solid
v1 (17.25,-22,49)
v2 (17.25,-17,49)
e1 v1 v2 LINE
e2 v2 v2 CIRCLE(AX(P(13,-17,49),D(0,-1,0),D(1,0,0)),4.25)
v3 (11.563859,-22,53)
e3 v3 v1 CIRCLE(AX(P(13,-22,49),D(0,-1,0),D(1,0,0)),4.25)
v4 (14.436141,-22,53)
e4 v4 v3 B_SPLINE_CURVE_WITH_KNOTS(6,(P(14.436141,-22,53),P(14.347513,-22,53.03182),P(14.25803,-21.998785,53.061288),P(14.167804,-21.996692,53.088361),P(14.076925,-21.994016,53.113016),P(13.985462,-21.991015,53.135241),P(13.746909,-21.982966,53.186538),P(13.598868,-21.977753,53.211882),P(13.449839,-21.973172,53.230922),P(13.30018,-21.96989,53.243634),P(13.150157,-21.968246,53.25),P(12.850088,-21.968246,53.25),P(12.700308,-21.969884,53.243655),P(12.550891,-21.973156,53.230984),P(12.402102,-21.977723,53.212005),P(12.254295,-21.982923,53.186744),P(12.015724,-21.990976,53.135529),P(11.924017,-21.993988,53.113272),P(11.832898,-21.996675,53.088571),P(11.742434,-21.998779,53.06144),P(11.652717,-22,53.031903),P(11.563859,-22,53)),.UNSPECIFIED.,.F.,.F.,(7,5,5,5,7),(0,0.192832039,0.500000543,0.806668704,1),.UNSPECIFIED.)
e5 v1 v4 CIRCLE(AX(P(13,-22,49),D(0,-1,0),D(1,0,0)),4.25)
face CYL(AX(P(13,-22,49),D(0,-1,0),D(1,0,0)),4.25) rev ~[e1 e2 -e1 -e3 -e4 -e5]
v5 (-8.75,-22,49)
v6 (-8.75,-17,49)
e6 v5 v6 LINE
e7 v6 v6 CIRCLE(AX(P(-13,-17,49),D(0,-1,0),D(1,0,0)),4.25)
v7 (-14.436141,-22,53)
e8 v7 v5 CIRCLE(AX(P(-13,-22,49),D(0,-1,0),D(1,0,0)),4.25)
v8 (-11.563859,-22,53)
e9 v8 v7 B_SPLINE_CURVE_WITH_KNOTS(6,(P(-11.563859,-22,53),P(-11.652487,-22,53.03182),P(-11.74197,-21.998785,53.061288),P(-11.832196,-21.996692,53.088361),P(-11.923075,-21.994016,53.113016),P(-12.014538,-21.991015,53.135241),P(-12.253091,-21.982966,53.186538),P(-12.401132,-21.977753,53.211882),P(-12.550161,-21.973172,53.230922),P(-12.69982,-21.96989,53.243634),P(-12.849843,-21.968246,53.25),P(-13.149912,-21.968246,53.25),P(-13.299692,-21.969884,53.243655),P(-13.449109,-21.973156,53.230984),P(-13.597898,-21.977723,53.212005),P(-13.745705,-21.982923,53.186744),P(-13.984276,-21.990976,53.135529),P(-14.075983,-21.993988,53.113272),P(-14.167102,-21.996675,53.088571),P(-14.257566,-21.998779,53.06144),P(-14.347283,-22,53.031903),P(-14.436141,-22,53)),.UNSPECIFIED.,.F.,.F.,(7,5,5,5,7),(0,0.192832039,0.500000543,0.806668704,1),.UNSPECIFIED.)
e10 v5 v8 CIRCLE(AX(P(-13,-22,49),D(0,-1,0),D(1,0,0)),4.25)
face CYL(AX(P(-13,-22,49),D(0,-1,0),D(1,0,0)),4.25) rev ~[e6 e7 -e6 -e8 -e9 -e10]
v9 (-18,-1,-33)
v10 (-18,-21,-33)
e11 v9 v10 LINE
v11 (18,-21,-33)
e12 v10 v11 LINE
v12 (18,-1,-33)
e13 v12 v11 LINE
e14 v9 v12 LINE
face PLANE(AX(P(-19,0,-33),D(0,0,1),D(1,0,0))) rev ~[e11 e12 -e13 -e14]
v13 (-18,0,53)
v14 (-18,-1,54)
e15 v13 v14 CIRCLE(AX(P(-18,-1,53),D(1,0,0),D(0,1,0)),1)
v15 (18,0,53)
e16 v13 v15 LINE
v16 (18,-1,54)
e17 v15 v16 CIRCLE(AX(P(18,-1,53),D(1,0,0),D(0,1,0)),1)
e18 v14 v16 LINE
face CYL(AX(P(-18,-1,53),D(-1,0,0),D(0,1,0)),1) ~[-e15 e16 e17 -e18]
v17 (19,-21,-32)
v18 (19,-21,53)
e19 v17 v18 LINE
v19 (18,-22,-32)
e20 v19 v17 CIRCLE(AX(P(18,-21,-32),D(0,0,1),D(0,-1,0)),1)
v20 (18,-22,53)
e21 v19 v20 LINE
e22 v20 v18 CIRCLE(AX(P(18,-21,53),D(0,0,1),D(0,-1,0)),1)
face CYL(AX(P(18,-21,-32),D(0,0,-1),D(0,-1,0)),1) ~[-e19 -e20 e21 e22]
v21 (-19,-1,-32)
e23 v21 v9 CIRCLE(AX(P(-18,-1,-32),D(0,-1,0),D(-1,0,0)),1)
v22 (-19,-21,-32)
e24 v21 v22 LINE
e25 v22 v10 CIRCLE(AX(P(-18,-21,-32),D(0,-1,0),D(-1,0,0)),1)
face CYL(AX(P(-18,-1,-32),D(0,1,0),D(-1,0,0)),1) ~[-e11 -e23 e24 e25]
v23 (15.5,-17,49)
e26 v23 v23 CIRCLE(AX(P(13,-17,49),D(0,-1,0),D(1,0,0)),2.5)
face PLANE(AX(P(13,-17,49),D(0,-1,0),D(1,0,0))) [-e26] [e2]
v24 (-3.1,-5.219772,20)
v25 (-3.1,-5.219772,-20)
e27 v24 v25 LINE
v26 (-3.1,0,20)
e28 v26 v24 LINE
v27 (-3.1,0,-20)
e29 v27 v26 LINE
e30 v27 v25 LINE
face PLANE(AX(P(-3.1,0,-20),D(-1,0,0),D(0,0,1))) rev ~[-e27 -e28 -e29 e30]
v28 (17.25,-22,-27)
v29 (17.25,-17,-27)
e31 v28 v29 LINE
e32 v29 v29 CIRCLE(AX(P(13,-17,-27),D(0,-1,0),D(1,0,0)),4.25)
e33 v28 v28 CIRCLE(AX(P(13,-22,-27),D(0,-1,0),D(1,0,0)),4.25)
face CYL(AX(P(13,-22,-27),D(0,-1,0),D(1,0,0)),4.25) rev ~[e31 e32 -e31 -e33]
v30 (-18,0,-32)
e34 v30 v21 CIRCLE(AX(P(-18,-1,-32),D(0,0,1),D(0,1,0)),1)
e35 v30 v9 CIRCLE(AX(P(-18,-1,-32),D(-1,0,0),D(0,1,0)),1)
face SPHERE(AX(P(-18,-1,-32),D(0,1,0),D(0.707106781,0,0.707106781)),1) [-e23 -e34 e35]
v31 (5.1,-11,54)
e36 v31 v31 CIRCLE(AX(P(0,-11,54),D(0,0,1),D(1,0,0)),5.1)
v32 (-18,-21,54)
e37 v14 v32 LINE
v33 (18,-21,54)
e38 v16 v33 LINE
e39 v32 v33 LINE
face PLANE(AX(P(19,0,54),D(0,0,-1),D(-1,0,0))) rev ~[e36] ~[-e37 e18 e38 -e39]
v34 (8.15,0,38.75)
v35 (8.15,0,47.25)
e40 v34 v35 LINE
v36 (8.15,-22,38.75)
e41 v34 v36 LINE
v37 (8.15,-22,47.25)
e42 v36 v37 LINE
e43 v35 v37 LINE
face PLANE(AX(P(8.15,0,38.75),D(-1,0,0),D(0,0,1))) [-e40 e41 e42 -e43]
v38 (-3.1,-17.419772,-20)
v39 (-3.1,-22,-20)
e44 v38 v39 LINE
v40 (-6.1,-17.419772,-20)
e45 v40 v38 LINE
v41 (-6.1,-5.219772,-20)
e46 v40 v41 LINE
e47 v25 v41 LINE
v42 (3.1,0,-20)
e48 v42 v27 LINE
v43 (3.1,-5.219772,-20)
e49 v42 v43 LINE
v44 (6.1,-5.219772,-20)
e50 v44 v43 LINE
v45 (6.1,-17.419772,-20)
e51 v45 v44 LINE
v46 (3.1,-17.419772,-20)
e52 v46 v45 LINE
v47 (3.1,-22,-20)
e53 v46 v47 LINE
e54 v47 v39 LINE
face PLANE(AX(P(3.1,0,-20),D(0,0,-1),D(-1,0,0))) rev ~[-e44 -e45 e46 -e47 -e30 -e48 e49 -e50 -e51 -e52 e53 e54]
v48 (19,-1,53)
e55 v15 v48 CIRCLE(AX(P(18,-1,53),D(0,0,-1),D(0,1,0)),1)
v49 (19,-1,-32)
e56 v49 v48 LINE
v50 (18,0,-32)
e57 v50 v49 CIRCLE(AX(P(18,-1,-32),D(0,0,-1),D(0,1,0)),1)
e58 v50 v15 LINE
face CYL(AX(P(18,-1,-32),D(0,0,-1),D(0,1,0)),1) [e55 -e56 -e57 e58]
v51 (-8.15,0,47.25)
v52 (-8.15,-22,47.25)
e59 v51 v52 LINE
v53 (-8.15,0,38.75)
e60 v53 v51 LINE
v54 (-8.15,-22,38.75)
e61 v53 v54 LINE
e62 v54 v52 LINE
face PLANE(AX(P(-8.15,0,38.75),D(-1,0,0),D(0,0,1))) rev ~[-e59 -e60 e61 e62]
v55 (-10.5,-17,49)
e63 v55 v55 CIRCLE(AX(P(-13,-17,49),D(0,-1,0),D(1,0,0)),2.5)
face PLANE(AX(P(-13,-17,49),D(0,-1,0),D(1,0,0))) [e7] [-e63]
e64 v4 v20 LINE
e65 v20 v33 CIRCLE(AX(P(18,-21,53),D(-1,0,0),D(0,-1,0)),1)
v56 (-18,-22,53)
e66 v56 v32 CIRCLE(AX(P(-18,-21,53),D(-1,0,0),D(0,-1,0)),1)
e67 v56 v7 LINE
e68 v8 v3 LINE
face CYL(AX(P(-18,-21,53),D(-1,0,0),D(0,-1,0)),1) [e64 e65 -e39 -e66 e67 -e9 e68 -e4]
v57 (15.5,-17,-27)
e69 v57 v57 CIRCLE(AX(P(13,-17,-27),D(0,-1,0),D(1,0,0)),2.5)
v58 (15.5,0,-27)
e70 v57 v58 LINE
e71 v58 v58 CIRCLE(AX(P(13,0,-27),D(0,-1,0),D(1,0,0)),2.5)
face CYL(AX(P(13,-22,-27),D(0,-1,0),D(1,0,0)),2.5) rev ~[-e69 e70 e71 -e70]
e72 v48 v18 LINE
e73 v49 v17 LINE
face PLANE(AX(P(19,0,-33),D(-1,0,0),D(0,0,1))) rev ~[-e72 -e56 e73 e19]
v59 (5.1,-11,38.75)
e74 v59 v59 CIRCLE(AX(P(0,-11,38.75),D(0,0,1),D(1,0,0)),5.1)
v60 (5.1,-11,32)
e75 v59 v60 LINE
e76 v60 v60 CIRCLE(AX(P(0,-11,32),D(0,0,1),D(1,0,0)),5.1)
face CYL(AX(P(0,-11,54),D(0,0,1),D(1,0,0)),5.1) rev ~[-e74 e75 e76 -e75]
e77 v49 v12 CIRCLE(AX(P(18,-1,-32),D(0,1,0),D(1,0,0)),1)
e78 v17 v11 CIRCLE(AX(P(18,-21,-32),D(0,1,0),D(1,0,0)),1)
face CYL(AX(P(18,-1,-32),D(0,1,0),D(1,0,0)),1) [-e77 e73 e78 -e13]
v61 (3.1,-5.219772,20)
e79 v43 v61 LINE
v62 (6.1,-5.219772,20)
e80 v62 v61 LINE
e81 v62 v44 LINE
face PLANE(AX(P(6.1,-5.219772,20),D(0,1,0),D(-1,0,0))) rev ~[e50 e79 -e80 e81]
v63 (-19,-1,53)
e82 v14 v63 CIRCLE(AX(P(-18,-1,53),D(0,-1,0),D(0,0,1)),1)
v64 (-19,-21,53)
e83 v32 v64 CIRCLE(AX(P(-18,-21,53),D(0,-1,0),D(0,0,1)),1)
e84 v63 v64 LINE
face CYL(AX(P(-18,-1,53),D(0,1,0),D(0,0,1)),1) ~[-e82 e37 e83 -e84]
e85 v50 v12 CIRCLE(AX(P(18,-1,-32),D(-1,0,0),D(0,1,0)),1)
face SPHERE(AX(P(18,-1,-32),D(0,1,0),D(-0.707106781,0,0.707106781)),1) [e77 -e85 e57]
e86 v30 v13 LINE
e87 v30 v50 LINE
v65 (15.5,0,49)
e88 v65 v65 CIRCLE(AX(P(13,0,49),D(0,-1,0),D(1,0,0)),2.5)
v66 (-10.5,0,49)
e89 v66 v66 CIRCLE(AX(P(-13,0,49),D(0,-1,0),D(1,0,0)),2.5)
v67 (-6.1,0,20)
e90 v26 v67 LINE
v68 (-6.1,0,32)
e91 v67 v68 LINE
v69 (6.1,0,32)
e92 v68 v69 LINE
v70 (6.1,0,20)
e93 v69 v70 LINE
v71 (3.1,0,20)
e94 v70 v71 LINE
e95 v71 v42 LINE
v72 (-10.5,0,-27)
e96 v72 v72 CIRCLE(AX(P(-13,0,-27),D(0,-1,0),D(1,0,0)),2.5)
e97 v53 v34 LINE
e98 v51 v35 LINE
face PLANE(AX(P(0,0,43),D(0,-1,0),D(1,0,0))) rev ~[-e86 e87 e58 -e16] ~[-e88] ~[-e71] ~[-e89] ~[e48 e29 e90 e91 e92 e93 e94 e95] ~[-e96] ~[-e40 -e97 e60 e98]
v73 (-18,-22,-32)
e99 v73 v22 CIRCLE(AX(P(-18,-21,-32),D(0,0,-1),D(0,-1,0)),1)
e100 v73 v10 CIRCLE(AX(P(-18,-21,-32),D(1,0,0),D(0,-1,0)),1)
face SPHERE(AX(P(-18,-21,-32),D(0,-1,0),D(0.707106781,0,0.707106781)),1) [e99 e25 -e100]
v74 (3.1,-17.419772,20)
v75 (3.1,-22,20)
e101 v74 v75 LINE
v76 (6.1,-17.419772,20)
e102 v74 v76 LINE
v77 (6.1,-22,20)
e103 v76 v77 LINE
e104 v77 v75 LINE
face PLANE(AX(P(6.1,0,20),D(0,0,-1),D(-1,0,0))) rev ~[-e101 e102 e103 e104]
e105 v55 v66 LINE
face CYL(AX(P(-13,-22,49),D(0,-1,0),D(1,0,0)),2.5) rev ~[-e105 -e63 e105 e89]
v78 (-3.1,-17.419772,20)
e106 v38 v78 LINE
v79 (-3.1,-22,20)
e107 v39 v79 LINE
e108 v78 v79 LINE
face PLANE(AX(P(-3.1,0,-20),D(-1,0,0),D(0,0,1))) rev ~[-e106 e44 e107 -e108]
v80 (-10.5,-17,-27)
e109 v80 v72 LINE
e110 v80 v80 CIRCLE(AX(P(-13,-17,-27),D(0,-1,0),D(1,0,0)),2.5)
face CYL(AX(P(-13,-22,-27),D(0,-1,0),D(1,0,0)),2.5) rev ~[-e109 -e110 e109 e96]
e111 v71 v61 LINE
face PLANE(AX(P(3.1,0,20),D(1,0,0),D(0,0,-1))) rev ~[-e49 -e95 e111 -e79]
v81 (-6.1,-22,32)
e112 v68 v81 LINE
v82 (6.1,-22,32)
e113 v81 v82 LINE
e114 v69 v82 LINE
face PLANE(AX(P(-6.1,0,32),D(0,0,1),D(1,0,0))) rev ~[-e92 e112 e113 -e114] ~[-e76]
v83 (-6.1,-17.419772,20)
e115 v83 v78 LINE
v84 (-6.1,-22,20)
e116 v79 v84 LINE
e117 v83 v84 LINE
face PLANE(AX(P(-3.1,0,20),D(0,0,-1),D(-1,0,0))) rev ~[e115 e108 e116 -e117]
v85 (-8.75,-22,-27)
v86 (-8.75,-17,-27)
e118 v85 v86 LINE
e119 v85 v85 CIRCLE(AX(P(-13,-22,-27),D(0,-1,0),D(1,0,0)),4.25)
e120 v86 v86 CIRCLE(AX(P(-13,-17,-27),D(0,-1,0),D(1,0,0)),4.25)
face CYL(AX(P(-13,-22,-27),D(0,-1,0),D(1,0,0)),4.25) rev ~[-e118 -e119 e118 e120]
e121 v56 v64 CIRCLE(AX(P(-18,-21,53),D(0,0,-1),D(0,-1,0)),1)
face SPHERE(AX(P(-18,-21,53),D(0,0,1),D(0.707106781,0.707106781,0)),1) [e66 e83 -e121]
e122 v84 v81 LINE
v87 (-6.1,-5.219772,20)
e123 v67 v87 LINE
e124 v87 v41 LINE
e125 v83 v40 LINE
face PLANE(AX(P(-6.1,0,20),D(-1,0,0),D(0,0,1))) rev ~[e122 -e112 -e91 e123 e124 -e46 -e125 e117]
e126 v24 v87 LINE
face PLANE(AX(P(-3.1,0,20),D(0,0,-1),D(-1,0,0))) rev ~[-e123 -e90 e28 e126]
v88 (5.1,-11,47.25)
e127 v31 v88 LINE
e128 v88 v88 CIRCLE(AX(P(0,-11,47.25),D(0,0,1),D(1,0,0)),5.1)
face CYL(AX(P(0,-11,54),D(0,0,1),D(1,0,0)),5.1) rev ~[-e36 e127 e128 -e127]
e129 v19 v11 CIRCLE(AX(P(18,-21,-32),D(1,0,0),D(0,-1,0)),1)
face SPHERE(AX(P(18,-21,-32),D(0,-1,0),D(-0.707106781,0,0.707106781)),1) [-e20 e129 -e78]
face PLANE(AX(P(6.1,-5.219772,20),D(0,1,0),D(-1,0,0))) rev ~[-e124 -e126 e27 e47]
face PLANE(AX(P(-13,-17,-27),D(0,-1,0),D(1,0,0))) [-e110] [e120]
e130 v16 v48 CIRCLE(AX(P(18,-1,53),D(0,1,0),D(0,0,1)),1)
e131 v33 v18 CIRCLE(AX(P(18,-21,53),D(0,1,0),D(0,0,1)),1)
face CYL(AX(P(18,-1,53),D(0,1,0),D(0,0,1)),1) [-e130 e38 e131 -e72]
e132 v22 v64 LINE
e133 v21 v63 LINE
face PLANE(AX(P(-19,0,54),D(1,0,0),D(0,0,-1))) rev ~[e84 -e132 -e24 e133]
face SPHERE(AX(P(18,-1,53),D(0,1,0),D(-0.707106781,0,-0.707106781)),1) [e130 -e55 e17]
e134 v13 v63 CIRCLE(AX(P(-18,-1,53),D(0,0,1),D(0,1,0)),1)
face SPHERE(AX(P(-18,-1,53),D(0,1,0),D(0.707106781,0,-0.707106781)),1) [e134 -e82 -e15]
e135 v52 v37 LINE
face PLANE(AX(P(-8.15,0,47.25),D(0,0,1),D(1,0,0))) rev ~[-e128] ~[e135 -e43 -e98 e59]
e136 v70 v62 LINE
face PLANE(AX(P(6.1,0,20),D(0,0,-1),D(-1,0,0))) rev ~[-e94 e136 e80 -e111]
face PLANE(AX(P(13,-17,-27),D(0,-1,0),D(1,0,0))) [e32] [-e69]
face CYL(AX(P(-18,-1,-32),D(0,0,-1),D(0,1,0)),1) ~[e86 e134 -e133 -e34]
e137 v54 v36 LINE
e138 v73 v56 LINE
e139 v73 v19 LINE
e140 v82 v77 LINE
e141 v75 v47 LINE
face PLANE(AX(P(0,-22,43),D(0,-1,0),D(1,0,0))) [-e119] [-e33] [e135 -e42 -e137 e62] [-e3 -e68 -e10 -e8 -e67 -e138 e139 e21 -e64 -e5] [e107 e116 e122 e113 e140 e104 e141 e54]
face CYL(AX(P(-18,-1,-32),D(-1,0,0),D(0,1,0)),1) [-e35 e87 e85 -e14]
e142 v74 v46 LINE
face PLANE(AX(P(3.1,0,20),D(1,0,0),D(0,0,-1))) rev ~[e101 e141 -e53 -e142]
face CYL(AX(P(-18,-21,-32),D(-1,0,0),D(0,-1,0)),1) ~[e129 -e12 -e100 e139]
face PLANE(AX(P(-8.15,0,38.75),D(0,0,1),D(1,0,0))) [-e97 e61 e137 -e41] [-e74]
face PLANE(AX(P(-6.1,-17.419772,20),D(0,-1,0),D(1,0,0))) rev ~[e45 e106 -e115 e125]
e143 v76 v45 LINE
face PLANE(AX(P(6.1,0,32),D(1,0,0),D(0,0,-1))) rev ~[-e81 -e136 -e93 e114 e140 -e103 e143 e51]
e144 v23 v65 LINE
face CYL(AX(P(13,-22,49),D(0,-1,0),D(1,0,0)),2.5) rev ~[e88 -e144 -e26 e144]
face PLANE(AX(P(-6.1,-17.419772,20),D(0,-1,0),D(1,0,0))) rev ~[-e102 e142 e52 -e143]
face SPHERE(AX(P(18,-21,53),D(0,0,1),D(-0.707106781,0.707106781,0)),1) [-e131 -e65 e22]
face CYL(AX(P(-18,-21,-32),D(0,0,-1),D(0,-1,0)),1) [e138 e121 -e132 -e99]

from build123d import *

# Parameters (mm, degrees)
F0_W         = 16.3
F0_H         = 8.5
F1_DEPTH     = 22
F2_R         = 5.1
F3_DEPTH     = 22
F4_W         = 3
F4_H         = 12.2
F4_W_2       = 9.2
F5_DEPTH     = 40
F6_R         = 2.5
F7_DEPTH     = 22.001
F6_R_2       = 4.25
F8_DEPTH     = 5
F9_T1_DEPTH  = 85
F9_T3_DEPTH  = 36
F9_T5_DEPTH  = 20
F9_S9_W      = 1
F9_S9_H      = 1
F9_T10_DEPTH = 1
F9_S15_W     = 1
F9_S15_H     = 1
F9_T16_DEPTH = 1
F9_S21_W     = 1
F9_S21_H     = 1
F9_T22_DEPTH = 1
F9_S27_W     = 1
F9_S27_H     = 1
F9_T28_DEPTH = 1
F9_S33_W     = 1
F9_S33_H     = 1
F9_T34_DEPTH = 1
F9_S39_W     = 1
F9_S39_H     = 1
F9_T40_DEPTH = 1
F9_S45_W     = 1
F9_S45_H     = 1
F9_T46_DEPTH = 1
F9_S51_W     = 1
F9_S51_H     = 1
F9_T52_DEPTH = 1


# Not quite as in the source:
# - a fillet or chamfer that OpenCascade refuses, or shapes differently, is made with other operations: its cross-section is extruded or revolved along the edge and cut away or added


with BuildPart() as f1:
    # F0 (on Front) → F1 (new body)
    with BuildSketch(Plane.XZ):
        Polygon((-19, 32), (-6.1, 32), (6.1, 32), (19, 32), (19, 54), (-19, 54), align=None)
        with Locations((0, 43)):
            Rectangle(F0_W, F0_H, mode=Mode.SUBTRACT)
        Polygon((-3.1, -20), (-3.1, 20), (-6.1, 20), (-6.1, 32), (-19, 32), (-19, -33), (19, -33), (19, 32), (6.1, 32), (6.1, 20), (3.1, 20), (3.1, -20), align=None)
    extrude(amount=F1_DEPTH)

    # F2 (on face) → F3 (cut, through all)
    with BuildSketch(Plane.XY.offset(54)):
        with Locations((0, -11)):
            Circle(F2_R)
    extrude(amount=-F3_DEPTH, mode=Mode.SUBTRACT)

    # F4 (on face) → F5 (cut)
    with BuildSketch(Plane.XY.offset(20)):
        with Locations((-4.6, -11.319772105)):
            Rectangle(F4_W, F4_H)
        with Locations((1.5, -11.319772105)):
            Rectangle(F4_W_2, F4_H)
    extrude(amount=-F5_DEPTH, mode=Mode.SUBTRACT)

    # F6 (on face) → F7 (cut, through all)
    with BuildSketch(Plane.XZ.offset(22)):
        with Locations((-13, 49)):
            Circle(F6_R)
        with Locations((13, 49)):
            Circle(F6_R)
        with Locations((-13, -27)):
            Circle(F6_R)
        with Locations((13, -27)):
            Circle(F6_R)
    extrude(amount=-F7_DEPTH, mode=Mode.SUBTRACT)

    # F6 (on face) → F8 (cut)
    with BuildSketch(Plane.XZ.offset(22)):
        with Locations((-13, 49)):
            Circle(F6_R_2)
        with Locations((-13, 49)):
            Circle(F6_R, mode=Mode.SUBTRACT)
        with Locations((13, 49)):
            Circle(F6_R_2)
        with Locations((13, 49)):
            Circle(F6_R, mode=Mode.SUBTRACT)
        with Locations((13, -27)):
            Circle(F6_R_2)
        with Locations((13, -27)):
            Circle(F6_R, mode=Mode.SUBTRACT)
        with Locations((-13, -27)):
            Circle(F6_R_2)
        with Locations((-13, -27)):
            Circle(F6_R, mode=Mode.SUBTRACT)
    extrude(amount=-F8_DEPTH, mode=Mode.SUBTRACT)

    # F9: fillet of radius 1 on 12 edges, made by hand

    # F9_s2 → F9_t1 (cut)
    with BuildSketch(Plane.XY.offset(-32)):
        with BuildLine():
            ThreePointArc((18, -22), (18.7071067812, -21.7071067812), (19, -21))
            Line((19, -21), (19, -22))
            Line((19, -22), (18, -22))
        make_face()
        with BuildLine():
            ThreePointArc((-18, -22), (-18.7071067812, -21.7071067812), (-19, -21))
            Line((-19, -21), (-19, -22))
            Line((-19, -22), (-18, -22))
        make_face()
        with BuildLine():
            ThreePointArc((-18, 0), (-18.7071067812, -0.2928932188), (-19, -1))
            Line((-19, -1), (-19, 0))
            Line((-19, 0), (-18, 0))
        make_face()
        with BuildLine():
            ThreePointArc((18, 0), (18.7071067812, -0.2928932188), (19, -1))
            Line((19, -1), (19, 0))
            Line((19, 0), (18, 0))
        make_face()
    extrude(amount=F9_T1_DEPTH, mode=Mode.SUBTRACT)

    # F9_s4 → F9_t3 (cut)
    with BuildSketch(Plane.YZ.offset(-18)):
        with BuildLine():
            ThreePointArc((-22, 53), (-21.7071067812, 53.7071067812), (-21, 54))
            Line((-21, 54), (-22, 54))
            Line((-22, 54), (-22, 53))
        make_face()
        with BuildLine():
            ThreePointArc((-22, -32), (-21.7071067812, -32.7071067812), (-21, -33))
            Line((-21, -33), (-22, -33))
            Line((-22, -33), (-22, -32))
        make_face()
        with BuildLine():
            ThreePointArc((0, 53), (-0.2928932188, 53.7071067812), (-1, 54))
            Line((-1, 54), (0, 54))
            Line((0, 54), (0, 53))
        make_face()
        with BuildLine():
            ThreePointArc((0, -32), (-0.2928932188, -32.7071067812), (-1, -33))
            Line((-1, -33), (0, -33))
            Line((0, -33), (0, -32))
        make_face()
    extrude(amount=F9_T3_DEPTH, mode=Mode.SUBTRACT)

    # F9_s6 → F9_t5 (cut)
    with BuildSketch(Plane.XZ.offset(1)):
        with BuildLine():
            ThreePointArc((19, -32), (18.7071067812, -32.7071067812), (18, -33))
            Line((18, -33), (19, -33))
            Line((19, -33), (19, -32))
        make_face()
        with BuildLine():
            ThreePointArc((18, 54), (18.7071067812, 53.7071067812), (19, 53))
            Line((19, 53), (19, 54))
            Line((19, 54), (18, 54))
        make_face()
        with BuildLine():
            ThreePointArc((-18, 54), (-18.7071067812, 53.7071067812), (-19, 53))
            Line((-19, 53), (-19, 54))
            Line((-19, 54), (-18, 54))
        make_face()
        with BuildLine():
            ThreePointArc((-19, -32), (-18.7071067812, -32.7071067812), (-18, -33))
            Line((-18, -33), (-19, -33))
            Line((-19, -33), (-19, -32))
        make_face()
    extrude(amount=F9_T5_DEPTH, mode=Mode.SUBTRACT)


with BuildPart() as f9_tool8:
    # F9_s9 → F9_t10 (new body)
    with BuildSketch(Plane.XZ.offset(21)):
        with Locations((18.5, -32.5)):
            Rectangle(F9_S9_W, F9_S9_H)
    extrude(amount=F9_T10_DEPTH)

    # F9_s11 → F9_t12 (revolve, cut)
    with BuildSketch(Plane(origin=(18, -21, -32), x_dir=(-0.7071067812, 0, 0.7071067812), z_dir=(0.7071067812, 0, 0.7071067812))):
        with BuildLine():
            ThreePointArc((0, -1), (1, 0), (0, 1))
            Line((0, 1), (0, -1))
        make_face()
    revolve(axis=Axis((18, -21, -32), (0, -1, 0)), mode=Mode.SUBTRACT)


with BuildPart() as f1_1:
    add(f1.part)

    # F9_t7: cut F9_tool8
    add(f9_tool8.part, mode=Mode.SUBTRACT)


with BuildPart() as f9_tool14:
    # F9_s15 → F9_t16 (new body)
    with BuildSketch(Plane.XY.offset(53)):
        with Locations((18.5, -21.5)):
            Rectangle(F9_S15_W, F9_S15_H)
    extrude(amount=F9_T16_DEPTH)

    # F9_s17 → F9_t18 (revolve, cut)
    with BuildSketch(Plane(origin=(18, -21, 53), x_dir=(-0.7071067812, 0.7071067812, 0), z_dir=(0.7071067812, 0.7071067812, 0))):
        with BuildLine():
            ThreePointArc((0, -1), (1, 0), (0, 1))
            Line((0, 1), (0, -1))
        make_face()
    revolve(axis=Axis((18, -21, 53), (0, 0, 1)), mode=Mode.SUBTRACT)


with BuildPart() as f1_2:
    add(f1_1.part)

    # F9_t13: cut F9_tool14
    add(f9_tool14.part, mode=Mode.SUBTRACT)


with BuildPart() as f9_tool20:
    # F9_s21 → F9_t22 (new body)
    with BuildSketch(Plane.XY.offset(53)):
        with Locations((-18.5, -21.5)):
            Rectangle(F9_S21_W, F9_S21_H)
    extrude(amount=F9_T22_DEPTH)

    # F9_s23 → F9_t24 (revolve, cut)
    with BuildSketch(Plane(origin=(-18, -21, 53), x_dir=(0.7071067812, 0.7071067812, 0), z_dir=(0.7071067812, -0.7071067812, 0))):
        with BuildLine():
            ThreePointArc((0, -1), (1, 0), (0, 1))
            Line((0, 1), (0, -1))
        make_face()
    revolve(axis=Axis((-18, -21, 53), (0, 0, 1)), mode=Mode.SUBTRACT)


with BuildPart() as f1_3:
    add(f1_2.part)

    # F9_t19: cut F9_tool20
    add(f9_tool20.part, mode=Mode.SUBTRACT)


with BuildPart() as f9_tool26:
    # F9_s27 → F9_t28 (new body)
    with BuildSketch(Plane.XZ.offset(21)):
        with Locations((-18.5, -32.5)):
            Rectangle(F9_S27_W, F9_S27_H)
    extrude(amount=F9_T28_DEPTH)

    # F9_s29 → F9_t30 (revolve, cut)
    with BuildSketch(Plane(origin=(-18, -21, -32), x_dir=(0.7071067812, 0, 0.7071067812), z_dir=(0.7071067812, 0, -0.7071067812))):
        with BuildLine():
            ThreePointArc((0, -1), (1, 0), (0, 1))
            Line((0, 1), (0, -1))
        make_face()
    revolve(axis=Axis((-18, -21, -32), (0, -1, 0)), mode=Mode.SUBTRACT)


with BuildPart() as f1_4:
    add(f1_3.part)

    # F9_t25: cut F9_tool26
    add(f9_tool26.part, mode=Mode.SUBTRACT)


with BuildPart() as f9_tool32:
    # F9_s33 → F9_t34 (new body)
    with BuildSketch(Plane.XZ.offset(1)):
        with Locations((18.5, -32.5)):
            Rectangle(F9_S33_W, F9_S33_H)
    extrude(amount=-F9_T34_DEPTH)

    # F9_s35 → F9_t36 (revolve, cut)
    with BuildSketch(Plane(origin=(18, -1, -32), x_dir=(-0.7071067812, 0, 0.7071067812), z_dir=(-0.7071067812, 0, -0.7071067812))):
        with BuildLine():
            ThreePointArc((0, -1), (1, 0), (0, 1))
            Line((0, 1), (0, -1))
        make_face()
    revolve(axis=Axis((18, -1, -32), (0, 1, 0)), mode=Mode.SUBTRACT)


with BuildPart() as f1_5:
    add(f1_4.part)

    # F9_t31: cut F9_tool32
    add(f9_tool32.part, mode=Mode.SUBTRACT)


with BuildPart() as f9_tool38:
    # F9_s39 → F9_t40 (new body)
    with BuildSketch(Plane.XZ.offset(1)):
        with Locations((18.5, 53.5)):
            Rectangle(F9_S39_W, F9_S39_H)
    extrude(amount=-F9_T40_DEPTH)

    # F9_s41 → F9_t42 (revolve, cut)
    with BuildSketch(Plane(origin=(18, -1, 53), x_dir=(-0.7071067812, 0, -0.7071067812), z_dir=(0.7071067812, 0, -0.7071067812))):
        with BuildLine():
            ThreePointArc((0, -1), (1, 0), (0, 1))
            Line((0, 1), (0, -1))
        make_face()
    revolve(axis=Axis((18, -1, 53), (0, 1, 0)), mode=Mode.SUBTRACT)


with BuildPart() as f1_6:
    add(f1_5.part)

    # F9_t37: cut F9_tool38
    add(f9_tool38.part, mode=Mode.SUBTRACT)


with BuildPart() as f9_tool44:
    # F9_s45 → F9_t46 (new body)
    with BuildSketch(Plane.XZ.offset(1)):
        with Locations((-18.5, 53.5)):
            Rectangle(F9_S45_W, F9_S45_H)
    extrude(amount=-F9_T46_DEPTH)

    # F9_s47 → F9_t48 (revolve, cut)
    with BuildSketch(Plane(origin=(-18, -1, 53), x_dir=(0.7071067812, 0, -0.7071067812), z_dir=(0.7071067812, 0, 0.7071067812))):
        with BuildLine():
            ThreePointArc((0, -1), (1, 0), (0, 1))
            Line((0, 1), (0, -1))
        make_face()
    revolve(axis=Axis((-18, -1, 53), (0, 1, 0)), mode=Mode.SUBTRACT)


with BuildPart() as f1_7:
    add(f1_6.part)

    # F9_t43: cut F9_tool44
    add(f9_tool44.part, mode=Mode.SUBTRACT)


with BuildPart() as f9_tool50:
    # F9_s51 → F9_t52 (new body)
    with BuildSketch(Plane.XZ.offset(1)):
        with Locations((-18.5, -32.5)):
            Rectangle(F9_S51_W, F9_S51_H)
    extrude(amount=-F9_T52_DEPTH)

    # F9_s53 → F9_t54 (revolve, cut)
    with BuildSketch(Plane(origin=(-18, -1, -32), x_dir=(0.7071067812, 0, 0.7071067812), z_dir=(-0.7071067812, 0, 0.7071067812))):
        with BuildLine():
            ThreePointArc((0, -1), (1, 0), (0, 1))
            Line((0, 1), (0, -1))
        make_face()
    revolve(axis=Axis((-18, -1, -32), (0, 1, 0)), mode=Mode.SUBTRACT)


with BuildPart() as f1_8:
    add(f1_7.part)

    # F9_t49: cut F9_tool50
    add(f9_tool50.part, mode=Mode.SUBTRACT)


solid = f1_8.part
